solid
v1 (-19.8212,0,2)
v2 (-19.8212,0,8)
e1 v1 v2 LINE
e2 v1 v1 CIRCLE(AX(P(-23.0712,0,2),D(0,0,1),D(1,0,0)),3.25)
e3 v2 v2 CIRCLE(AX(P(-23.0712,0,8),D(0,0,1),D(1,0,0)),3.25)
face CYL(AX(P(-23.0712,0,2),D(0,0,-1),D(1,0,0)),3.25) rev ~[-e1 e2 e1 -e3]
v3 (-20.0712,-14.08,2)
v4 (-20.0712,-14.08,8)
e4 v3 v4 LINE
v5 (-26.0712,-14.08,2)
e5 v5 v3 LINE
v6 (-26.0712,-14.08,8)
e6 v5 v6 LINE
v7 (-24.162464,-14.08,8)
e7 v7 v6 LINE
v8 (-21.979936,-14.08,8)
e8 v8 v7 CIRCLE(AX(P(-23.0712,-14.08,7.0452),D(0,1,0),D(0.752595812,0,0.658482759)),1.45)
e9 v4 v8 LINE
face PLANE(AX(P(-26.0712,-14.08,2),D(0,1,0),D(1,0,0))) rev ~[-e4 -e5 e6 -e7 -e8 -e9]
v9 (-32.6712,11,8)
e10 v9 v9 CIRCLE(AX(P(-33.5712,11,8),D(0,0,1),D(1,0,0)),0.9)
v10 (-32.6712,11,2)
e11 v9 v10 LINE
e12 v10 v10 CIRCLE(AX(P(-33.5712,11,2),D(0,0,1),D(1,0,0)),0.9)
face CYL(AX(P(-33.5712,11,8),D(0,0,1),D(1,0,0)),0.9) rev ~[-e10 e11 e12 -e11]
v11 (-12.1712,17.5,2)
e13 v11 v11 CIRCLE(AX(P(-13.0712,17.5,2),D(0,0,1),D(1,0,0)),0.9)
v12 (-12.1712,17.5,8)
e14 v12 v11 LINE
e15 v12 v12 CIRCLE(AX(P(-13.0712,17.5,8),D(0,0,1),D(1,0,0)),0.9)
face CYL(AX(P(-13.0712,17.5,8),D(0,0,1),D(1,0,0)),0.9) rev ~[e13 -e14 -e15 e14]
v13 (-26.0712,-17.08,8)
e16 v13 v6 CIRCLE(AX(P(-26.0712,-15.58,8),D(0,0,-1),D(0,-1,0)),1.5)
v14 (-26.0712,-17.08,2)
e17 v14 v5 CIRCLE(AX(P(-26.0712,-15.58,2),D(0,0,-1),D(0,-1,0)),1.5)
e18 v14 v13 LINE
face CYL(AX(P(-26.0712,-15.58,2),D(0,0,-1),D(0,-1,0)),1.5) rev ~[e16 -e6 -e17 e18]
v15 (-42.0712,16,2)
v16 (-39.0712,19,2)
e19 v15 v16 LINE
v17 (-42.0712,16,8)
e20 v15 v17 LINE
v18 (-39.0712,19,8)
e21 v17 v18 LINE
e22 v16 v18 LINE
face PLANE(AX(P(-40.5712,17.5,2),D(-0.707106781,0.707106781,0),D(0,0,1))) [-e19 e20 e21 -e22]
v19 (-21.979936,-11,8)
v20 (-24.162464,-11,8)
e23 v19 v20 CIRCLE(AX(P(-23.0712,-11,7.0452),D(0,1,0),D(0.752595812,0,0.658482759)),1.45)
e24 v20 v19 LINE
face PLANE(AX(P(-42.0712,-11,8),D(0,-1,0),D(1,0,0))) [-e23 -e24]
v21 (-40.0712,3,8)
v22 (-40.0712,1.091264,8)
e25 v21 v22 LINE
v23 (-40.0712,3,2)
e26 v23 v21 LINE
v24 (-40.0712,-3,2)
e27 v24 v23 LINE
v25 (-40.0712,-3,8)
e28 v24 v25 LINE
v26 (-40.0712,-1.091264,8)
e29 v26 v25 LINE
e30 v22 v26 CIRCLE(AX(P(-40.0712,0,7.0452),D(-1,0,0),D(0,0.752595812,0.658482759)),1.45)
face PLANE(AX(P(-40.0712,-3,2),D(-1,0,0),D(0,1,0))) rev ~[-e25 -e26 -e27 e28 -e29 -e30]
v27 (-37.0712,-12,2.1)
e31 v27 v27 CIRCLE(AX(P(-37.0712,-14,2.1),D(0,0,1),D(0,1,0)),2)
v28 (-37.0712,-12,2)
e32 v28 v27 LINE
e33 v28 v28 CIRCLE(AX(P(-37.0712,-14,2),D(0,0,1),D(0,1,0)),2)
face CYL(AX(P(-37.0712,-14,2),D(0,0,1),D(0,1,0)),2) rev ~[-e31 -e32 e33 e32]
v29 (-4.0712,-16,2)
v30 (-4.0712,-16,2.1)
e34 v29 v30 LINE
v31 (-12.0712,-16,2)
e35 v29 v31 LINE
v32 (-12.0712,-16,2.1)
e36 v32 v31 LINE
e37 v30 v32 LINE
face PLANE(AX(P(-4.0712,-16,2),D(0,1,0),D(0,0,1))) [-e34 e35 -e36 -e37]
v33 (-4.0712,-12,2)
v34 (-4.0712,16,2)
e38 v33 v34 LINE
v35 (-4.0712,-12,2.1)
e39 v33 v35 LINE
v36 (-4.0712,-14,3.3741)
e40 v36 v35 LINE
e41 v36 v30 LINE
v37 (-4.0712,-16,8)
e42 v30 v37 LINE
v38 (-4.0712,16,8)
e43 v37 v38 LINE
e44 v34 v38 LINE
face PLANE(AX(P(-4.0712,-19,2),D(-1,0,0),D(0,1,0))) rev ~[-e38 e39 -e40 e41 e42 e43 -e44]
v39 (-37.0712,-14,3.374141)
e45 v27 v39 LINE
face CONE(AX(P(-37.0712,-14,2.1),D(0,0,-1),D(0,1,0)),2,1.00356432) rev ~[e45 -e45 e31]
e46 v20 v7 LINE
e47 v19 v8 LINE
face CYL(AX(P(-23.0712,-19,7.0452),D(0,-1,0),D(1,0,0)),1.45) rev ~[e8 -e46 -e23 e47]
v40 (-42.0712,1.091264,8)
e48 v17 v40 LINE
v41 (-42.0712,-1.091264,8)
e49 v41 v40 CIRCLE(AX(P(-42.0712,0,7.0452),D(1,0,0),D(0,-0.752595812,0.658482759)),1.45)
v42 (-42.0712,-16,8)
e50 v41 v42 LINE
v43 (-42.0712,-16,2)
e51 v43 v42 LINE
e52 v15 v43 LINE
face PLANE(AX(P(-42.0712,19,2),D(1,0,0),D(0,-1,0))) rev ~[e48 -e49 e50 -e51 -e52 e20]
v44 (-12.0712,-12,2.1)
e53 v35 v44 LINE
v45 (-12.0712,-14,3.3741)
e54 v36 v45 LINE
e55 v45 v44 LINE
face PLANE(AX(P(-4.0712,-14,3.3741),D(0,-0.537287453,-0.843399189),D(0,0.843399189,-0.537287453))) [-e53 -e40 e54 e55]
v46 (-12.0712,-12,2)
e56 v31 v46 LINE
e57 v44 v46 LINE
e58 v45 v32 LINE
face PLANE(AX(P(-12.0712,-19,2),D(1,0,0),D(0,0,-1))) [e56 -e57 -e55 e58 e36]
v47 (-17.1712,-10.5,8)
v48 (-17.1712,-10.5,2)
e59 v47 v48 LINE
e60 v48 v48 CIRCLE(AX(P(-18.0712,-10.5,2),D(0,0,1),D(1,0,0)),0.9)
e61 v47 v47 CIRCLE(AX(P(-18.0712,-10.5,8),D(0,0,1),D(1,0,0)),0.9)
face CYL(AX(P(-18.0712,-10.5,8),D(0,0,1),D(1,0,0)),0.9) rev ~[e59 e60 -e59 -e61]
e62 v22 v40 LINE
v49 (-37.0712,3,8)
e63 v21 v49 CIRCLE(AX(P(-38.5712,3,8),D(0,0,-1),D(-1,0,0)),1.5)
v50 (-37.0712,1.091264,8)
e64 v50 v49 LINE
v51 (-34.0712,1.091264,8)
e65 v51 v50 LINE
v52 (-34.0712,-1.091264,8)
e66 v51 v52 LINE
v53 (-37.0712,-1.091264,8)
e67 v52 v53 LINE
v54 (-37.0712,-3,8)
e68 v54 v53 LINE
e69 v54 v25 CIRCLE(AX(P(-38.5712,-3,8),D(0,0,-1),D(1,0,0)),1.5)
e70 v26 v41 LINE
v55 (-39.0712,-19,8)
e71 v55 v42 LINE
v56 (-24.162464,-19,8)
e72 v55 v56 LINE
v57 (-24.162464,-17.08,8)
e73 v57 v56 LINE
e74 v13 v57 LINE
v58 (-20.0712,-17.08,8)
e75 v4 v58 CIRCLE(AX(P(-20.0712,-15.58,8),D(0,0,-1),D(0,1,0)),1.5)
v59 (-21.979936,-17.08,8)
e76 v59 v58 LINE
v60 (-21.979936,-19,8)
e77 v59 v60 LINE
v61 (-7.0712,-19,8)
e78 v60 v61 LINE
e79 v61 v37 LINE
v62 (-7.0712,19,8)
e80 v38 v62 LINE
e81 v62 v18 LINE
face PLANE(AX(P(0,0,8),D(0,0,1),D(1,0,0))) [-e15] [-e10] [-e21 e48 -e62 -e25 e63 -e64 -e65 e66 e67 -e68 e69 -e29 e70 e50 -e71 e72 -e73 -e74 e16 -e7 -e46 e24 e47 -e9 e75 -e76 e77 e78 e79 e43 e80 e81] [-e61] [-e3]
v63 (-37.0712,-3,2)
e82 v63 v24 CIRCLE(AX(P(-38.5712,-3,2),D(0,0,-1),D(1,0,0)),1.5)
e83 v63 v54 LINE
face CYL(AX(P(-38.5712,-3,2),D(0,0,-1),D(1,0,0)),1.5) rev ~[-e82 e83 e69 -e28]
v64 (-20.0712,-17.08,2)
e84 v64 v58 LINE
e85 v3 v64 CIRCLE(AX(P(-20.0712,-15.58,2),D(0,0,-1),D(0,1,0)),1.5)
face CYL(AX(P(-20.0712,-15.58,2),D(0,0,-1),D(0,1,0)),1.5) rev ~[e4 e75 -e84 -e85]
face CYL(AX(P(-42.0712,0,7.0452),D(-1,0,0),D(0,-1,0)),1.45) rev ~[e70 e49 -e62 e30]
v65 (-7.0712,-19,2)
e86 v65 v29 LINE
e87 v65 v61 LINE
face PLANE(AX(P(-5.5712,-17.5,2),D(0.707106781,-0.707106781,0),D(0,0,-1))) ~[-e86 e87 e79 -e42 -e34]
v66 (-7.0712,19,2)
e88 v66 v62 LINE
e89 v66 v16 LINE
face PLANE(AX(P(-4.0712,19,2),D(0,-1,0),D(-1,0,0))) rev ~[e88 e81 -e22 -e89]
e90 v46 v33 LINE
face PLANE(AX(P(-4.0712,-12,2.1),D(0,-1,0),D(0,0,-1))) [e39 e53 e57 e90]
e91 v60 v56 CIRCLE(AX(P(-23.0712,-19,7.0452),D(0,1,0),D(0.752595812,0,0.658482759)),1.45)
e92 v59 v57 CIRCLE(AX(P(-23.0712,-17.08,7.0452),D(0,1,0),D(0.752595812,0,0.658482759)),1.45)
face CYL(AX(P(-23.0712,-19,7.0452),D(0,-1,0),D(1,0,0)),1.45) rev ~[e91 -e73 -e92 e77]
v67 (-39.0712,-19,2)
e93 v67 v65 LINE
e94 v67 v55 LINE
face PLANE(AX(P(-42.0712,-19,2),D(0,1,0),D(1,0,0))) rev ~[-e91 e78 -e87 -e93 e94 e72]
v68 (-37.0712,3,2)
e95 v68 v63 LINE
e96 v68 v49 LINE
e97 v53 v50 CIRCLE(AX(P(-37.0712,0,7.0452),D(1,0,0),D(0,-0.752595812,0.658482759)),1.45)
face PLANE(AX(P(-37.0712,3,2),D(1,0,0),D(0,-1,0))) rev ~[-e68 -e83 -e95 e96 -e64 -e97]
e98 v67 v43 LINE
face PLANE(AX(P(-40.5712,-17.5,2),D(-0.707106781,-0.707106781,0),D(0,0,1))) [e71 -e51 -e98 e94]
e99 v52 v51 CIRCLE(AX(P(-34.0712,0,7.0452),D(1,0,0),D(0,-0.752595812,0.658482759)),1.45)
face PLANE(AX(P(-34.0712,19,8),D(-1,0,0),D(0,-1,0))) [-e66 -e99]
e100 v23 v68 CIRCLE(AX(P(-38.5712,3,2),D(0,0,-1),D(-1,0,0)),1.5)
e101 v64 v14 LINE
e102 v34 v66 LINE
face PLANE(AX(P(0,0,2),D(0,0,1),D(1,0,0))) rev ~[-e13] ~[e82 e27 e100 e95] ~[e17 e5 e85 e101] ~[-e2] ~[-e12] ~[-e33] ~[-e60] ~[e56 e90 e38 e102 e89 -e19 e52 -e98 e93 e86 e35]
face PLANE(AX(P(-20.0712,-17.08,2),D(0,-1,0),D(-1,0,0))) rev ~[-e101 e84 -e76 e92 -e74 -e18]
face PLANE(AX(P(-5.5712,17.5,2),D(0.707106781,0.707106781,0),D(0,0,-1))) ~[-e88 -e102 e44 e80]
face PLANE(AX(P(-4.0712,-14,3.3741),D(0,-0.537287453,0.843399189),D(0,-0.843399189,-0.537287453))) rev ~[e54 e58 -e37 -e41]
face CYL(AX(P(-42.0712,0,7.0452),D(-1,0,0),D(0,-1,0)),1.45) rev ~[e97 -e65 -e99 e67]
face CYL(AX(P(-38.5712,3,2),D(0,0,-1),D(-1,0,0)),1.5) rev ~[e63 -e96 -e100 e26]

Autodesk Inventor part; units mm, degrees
ref_plane "YZ Plane" through (0, 0, 0) normal (1, 0, 0) x (0, 1, 0)
ref_plane "XZ Plane" through (0, 0, 0) normal (0, 1, 0) x (-1, 0, 0)
ref_plane "XY Plane" through (0, 0, 0) normal (0, 0, 1) x (1, 0, 0)
ref_plane "Work Plane1" through (0, 0, 2) normal (0, 0, 1) x (1, 0, 0)
sketch "Sketch1" plane through (0, 0, 2) normal (0, 0, 1) x (1, 0, 0)
  circle A0 centre (-37.0712, 14) radius 3.25 construction
  circle A1 centre (-9.0712, -14) radius 3.25 construction
  line L0 (-26.0712, -17.08) -> (-20.0712, -17.08) construction
  arc A2 (-20.0712, -17.08) -> (-20.0712, -14.08) centre (-20.0712, -15.58) ccw construction
  line L1 (-20.0712, -14.08) -> (-26.0712, -14.08) construction
  line L2 (-37.0712, -3) -> (-37.0712, 3) construction
  arc A3 (-37.0712, 3) -> (-40.0712, 3) centre (-38.5712, 3) ccw construction
  line L3 (-40.0712, 3) -> (-40.0712, -3) construction
  line L4 (-47.9712, -17) -> (-47.9712, 17) construction
  line L5 (-47.9712, 17) -> (-44.3964, 17) construction
  line L6 (-44.3964, 17) -> (-40.0712, 21.3252) construction
  line L7 (-40.0712, 21.3252) -> (-40.0712, 24.9) construction
  line L8 (-40.0712, 24.9) -> (-6.0712, 24.9) construction
  line L9 (-6.0712, 24.9) -> (-6.0712, 21.3252) construction
  line L10 (-6.0712, 21.3252) -> (-1.746, 17) construction
  line L11 (-1.746, 17) -> (1.8288, 17) construction
  line L12 (1.8288, 17) -> (1.8288, -17) construction
  line L13 (1.8288, -17) -> (-1.746, -17) construction
  line L14 (-1.746, -17) -> (-6.1126, -21.3666) construction
  line L15 (-6.1126, -21.3666) -> (-6.1126, -24.9) construction
  line L16 (-6.1126, -24.9) -> (-40.0712, -24.9) construction
  circle A4 centre (-37.0712, -14) radius 3.25 construction
  circle A5 centre (-23.0712, 0) radius 12.45 construction
  circle A6 centre (-23.0712, 0) radius 12.7 construction
  line L17 (-37.0712, 14) -> (-9.0712, 14) construction
  line L18 (-9.0712, 14) -> (-9.0712, -14) construction
  line L19 (-9.0712, -14) -> (-37.0712, -14) construction
  line L20 (-37.0712, -14) -> (-37.0712, 14) construction
  line L21 (-4.0712, -19) -> (-4.0712, 19)
  line L22 (-4.0712, 19) -> (-42.0712, 19)
  line L23 (-42.0712, 19) -> (-42.0712, -19)
  line L24 (-42.0712, -19) -> (-4.0712, -19)
  circle A7 centre (-23.0712, 0) radius 12.8
  circle A8 centre (-23.0712, 0) radius 3.25 projected
  line L25 (-40.0712, -24.9) -> (-40.0712, -21.3252) projected
  line L26 (-40.0712, -21.3252) -> (-44.3964, -17) projected
  line L27 (-44.3964, -17) -> (-47.9712, -17) projected
  arc A9 (-26.0712, -14.08) -> (-26.0712, -17.08) centre (-26.0712, -15.58) ccw projected
  arc A10 (-40.0712, -3) -> (-37.0712, -3) centre (-38.5712, -3) ccw projected
  circle A11 centre (-37.0712, -14) radius 3.25 projected
  point P0 (0, 0)
  point P1 (-21.8762, -3.0223)
  point P2 (-25.9925, 1.4242)
  dimension "d0" = 5
  dimension "d1" = 0.1
extrude "Extrusion1" add sketch "Sketch1" along normal blind 6 contours L24 L23 L22 L21 | A7 | A11
sketch "Sketch2" plane through (0, 0, 2) normal (0, 0, -1) x (-1, 0, 0)
  circle A0 centre (23.0712, 0) radius 12.8 projected
  circle A1 centre (23.0712, 0) radius 8.5824
  point P0 (0, 0)
extrude "Extrusion2" add sketch "Sketch2" against normal blind 0.5
sketch "Sketch3" plane through (0, 0, 2) normal (0, 0, -1) x (-1, 0, 0)
  circle A0 centre (9.0712, -14) radius 1.45 construction
  circle A1 centre (9.0712, -14) radius 2.45
  circle A2 centre (37.0712, -14) radius 1.45 projected
  circle A3 centre (37.0712, -14) radius 1.95
  point P0 (0, 0)
  dimension "d8" = 1
  dimension "d10" = 0.5
sketch "Sketch5" plane through (0, 0, 2) normal (0, 0, -1) x (-1, 0, 0)
  arc A0 (20.0712, -14.08) -> (20.0712, -17.08) centre (20.0712, -15.58) ccw projected
  arc A1 (26.0712, -17.08) -> (26.0712, -14.08) centre (26.0712, -15.58) ccw projected
  line L0 (37.0712, 3) -> (37.0712, -3) projected
  arc A2 (37.0712, -3) -> (40.0712, -3) centre (38.5712, -3) ccw projected
  line L1 (40.0712, -3) -> (40.0712, 3) projected
  arc A3 (40.0712, 3) -> (37.0712, 3) centre (38.5712, 3) ccw projected
  line L2 (26.0712, -14.08) -> (20.0712, -14.08) projected
  arc A4 (20.0712, -14.08) -> (20.0712, -17.08) centre (20.0712, -15.58) ccw projected
  line L3 (20.0712, -17.08) -> (26.0712, -17.08) projected
  arc A5 (26.0712, -17.08) -> (26.0712, -14.08) centre (26.0712, -15.58) ccw projected
  circle A6 centre (37.0712, -14) radius 1.45 projected
  circle A7 centre (23.0712, 0) radius 1.45 projected
  circle A8 centre (9.0712, -14) radius 1.45 projected
  circle A9 centre (37.0712, 14) radius 1.45 projected
  line L4 (-1.8288, -17) -> (-1.8288, 17) projected
  line L5 (-1.8288, 17) -> (1.746, 17) projected
  line L6 (1.746, 17) -> (6.0712, 21.3252) projected
  line L7 (6.0712, 21.3252) -> (6.0712, 24.9) projected
  line L8 (6.0712, 24.9) -> (40.0712, 24.9) projected
  line L9 (40.0712, 24.9) -> (40.0712, 21.3252) projected
  line L10 (40.0712, 21.3252) -> (44.3964, 17) projected
  line L11 (44.3964, 17) -> (47.9712, 17) projected
  line L12 (47.9712, 17) -> (47.9712, -17) projected
  line L13 (44.3964, -17) -> (47.9712, -17) projected
  line L14 (40.0712, -21.3252) -> (44.3964, -17) projected
  line L15 (40.0712, -24.9) -> (40.0712, -21.3252) projected
  line L16 (6.1126, -24.9) -> (40.0712, -24.9) projected
  line L17 (6.1126, -24.9) -> (6.1126, -21.3666) projected
  line L18 (6.1126, -21.3666) -> (1.746, -17) projected
  line L19 (1.746, -17) -> (-1.8288, -17) projected
  point P0 (0, 0)
  point P1 (40.0712, -3)
extrude "Extrusion5" cut sketch "Sketch5" against normal blind 8 contours L2 A1 L3 A0 | A3 L1 A2 L0
sketch "Sketch6" plane through (-42.0712, -19, 8) normal (0, -1, 0) x (1, 0, 0)
  line L0 (0, -6) -> (38, -6) projected
  line L1 (38, -6) -> (38, 0) projected
  line L2 (0, 0) -> (38, 0) projected
  line L3 (0, -6) -> (0, 0) projected
  line L4 (31.8, 0) -> (31.8, 0) projected
  circle A0 centre (19, -0.9548) radius 1.45
  point P0 (42.0712, -8)
  point P1 (4.5, 0)
  dimension "d34" = 2.9
extrude "Extrusion6" cut sketch "Sketch6" against normal blind 8 contours A0 L2 | L2 A0
pattern_circular "Circular Pattern1" count 2 over 90 about axis through (-23.0712, 0, 2) along (0, 0, -1) of "Extrusion6"
chamfer "Chamfer1" distance 3 angle 45 4 edges at (-42.0712, 19, 5) (-4.0712, 19, 5) (-4.0712, -19, 5) (-42.0712, -19, 5)
hole "Hole1" at (-37.0712, -14, 2) direction (0, 0, 1) diameter 4 depth 0.1 tip angle 115
sketch "Sketch4" plane through (-4.0712, -19, 2) normal (1, 0, 0) x (0, 0, -1)
  line L0 (2, 4.45) -> (6, 4.45)
  line L1 (2, 1.55) -> (6, 1.55)
  line L2 (0, 0) -> (0, 38) projected
  arc A0 (2, 19) -> (2, 19) centre (1.5, 4.4206) ccw projected
  line L3 (-1.3741, 5) -> (-0.1, 7) projected
  line L4 (-1.3741, 5) -> (-0.1, 3) projected
  line L5 (-0.1, 7) -> (0.6045, 7)
  line L6 (0.6045, 7) -> (0.6045, 3)
  line L7 (0.6045, 3) -> (-0.1, 3)
  line L8 (-0.1, 3) -> (-0.1, 7)
extrude "Extrusion4" cut sketch "Sketch4" against normal blind 8 contours L7 L8 L5 L2 | L2 L5 L6 L7 | L4 L3 L8
sketch "Sketch7" plane through (0, 0, 8) normal (0, 0, 1) x (1, 0, 0)
  circle A0 centre (-18.0712, -10.5) radius 1
  circle A1 centre (-33.5712, 11) radius 1
  circle A2 centre (-13.0712, 17.5) radius 1
  circle A3 centre (-18.0712, -10.5) radius 0.9
  circle A4 centre (-33.5712, 11) radius 0.9
  circle A5 centre (-13.0712, 17.5) radius 0.9
  point P0 (0, 0)
  dimension "d44" = 1.8
  dimension "d45" = 1.8
  dimension "d46" = 1.8
extrude "Extrusion7" cut sketch "Sketch7" against normal through all contours A3 | A4 | A5
ref_plane "Arbeitsebene2" through (-23.0712, 0, 7.0452) normal (-1, 0, 0) x (0, 0, 1)
ref_plane "Arbeitsebene3" through (-23.0712, 0, 7.0452) normal (0, -1, 0) x (1, 0, 0)
properties part number "20_Cube_Insert_Kinematic_Mirrormount_90_pro_v3"
